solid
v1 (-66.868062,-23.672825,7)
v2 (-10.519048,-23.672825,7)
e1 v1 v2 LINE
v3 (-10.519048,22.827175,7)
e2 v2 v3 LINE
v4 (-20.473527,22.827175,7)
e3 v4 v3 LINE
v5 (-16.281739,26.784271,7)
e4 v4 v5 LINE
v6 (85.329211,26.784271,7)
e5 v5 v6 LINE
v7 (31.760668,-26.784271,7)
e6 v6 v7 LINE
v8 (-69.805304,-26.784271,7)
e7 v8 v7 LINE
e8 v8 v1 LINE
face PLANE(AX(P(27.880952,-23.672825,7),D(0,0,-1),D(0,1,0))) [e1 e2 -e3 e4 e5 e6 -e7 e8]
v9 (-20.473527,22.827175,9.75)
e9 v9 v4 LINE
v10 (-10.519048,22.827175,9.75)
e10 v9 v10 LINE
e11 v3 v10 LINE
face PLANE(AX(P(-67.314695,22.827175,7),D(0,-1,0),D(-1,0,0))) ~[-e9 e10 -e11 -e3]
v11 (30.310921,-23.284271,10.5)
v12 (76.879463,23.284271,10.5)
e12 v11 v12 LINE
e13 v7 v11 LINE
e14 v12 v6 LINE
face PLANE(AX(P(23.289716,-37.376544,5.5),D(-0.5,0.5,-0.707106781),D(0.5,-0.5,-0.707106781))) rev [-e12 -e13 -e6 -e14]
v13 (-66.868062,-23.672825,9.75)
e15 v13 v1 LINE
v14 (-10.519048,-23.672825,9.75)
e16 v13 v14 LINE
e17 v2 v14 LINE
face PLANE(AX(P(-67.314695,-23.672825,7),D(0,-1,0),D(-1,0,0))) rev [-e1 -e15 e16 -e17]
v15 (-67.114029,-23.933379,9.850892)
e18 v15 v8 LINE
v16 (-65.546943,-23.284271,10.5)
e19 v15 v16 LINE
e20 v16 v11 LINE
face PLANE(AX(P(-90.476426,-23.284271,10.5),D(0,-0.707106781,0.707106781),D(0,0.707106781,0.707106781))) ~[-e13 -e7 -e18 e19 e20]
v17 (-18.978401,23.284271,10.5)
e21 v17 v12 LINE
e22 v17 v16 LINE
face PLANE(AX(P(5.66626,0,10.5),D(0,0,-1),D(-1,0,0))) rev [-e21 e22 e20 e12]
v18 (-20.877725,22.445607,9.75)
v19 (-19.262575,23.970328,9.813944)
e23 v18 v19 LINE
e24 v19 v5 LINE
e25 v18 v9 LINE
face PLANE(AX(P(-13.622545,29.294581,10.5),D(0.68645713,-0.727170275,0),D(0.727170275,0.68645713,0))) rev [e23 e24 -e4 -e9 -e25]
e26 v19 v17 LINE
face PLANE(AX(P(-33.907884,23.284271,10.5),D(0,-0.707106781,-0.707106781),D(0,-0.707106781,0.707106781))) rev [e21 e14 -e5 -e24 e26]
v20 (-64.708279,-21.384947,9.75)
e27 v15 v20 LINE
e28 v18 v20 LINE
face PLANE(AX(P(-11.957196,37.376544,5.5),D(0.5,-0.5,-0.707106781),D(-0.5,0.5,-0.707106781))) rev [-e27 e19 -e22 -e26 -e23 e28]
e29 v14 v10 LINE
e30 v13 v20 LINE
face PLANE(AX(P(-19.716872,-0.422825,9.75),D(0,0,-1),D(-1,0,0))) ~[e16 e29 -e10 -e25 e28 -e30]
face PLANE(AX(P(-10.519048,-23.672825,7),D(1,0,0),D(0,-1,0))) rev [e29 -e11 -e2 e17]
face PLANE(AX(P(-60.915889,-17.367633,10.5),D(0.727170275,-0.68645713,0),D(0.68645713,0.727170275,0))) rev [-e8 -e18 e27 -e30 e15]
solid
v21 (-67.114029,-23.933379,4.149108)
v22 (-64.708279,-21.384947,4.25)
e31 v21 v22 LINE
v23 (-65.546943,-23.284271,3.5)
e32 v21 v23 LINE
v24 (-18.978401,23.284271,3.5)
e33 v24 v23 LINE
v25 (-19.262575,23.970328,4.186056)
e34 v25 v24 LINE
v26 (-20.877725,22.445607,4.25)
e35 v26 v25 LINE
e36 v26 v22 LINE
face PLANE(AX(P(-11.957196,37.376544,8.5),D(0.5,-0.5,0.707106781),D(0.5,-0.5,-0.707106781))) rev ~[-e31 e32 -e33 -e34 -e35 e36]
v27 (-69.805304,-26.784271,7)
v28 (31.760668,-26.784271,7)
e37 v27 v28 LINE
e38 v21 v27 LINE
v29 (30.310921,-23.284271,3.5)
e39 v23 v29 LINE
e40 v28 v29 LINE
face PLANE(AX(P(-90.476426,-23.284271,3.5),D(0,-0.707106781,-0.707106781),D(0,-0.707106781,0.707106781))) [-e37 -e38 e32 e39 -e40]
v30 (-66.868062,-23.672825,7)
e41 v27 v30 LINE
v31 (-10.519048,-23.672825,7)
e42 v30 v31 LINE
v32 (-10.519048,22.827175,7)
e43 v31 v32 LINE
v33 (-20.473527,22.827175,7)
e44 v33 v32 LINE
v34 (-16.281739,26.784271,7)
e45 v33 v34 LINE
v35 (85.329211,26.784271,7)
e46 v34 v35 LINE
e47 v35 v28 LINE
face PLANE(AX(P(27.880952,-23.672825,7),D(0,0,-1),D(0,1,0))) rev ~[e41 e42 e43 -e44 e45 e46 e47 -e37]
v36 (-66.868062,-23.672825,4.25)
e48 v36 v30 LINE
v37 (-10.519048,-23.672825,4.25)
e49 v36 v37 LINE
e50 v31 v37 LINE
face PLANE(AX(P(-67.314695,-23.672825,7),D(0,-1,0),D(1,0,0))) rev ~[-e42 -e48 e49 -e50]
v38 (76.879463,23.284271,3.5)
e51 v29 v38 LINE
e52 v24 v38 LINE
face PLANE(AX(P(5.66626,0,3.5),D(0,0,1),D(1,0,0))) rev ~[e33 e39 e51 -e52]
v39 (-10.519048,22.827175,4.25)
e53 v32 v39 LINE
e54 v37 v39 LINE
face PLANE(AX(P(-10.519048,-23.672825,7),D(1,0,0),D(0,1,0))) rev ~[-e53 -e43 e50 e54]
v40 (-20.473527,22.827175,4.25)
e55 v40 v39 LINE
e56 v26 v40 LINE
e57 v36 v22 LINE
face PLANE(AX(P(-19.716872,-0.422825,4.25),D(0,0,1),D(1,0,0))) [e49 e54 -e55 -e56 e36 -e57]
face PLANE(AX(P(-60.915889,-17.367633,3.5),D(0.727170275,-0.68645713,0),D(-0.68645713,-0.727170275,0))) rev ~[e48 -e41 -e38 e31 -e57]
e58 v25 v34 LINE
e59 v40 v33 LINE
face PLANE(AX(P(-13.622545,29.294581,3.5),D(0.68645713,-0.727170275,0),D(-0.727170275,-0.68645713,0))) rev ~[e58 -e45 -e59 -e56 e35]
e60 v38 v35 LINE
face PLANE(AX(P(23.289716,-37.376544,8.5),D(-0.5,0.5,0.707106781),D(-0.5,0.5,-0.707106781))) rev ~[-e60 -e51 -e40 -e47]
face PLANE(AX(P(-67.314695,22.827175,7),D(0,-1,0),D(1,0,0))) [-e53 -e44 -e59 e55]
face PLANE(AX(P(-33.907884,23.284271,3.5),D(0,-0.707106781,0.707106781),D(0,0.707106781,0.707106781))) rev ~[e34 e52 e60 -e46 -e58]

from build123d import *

# Parameters (mm, degrees)
F2_DEPTH    = 3.5
F3_T1_DEPTH = 105.7168298797
F3_T3_DEPTH = 135.7168298797
F3_T5_DEPTH = 105.7168298797
F3_T7_DEPTH = 135.7168298797
F5_W        = 95.1956471843
F5_H        = 46.5
F6_DEPTH    = 2.75
F7_DEPTH    = 25
F9_DEPTH    = 38.4
F10_DEPTH   = 38.4


# Not quite as in the source:
# - a fillet or chamfer that OpenCascade refuses, or shapes differently, is made with other operations: its cross-section is extruded or revolved along the edge and cut away or added


with BuildPart() as f2:
    # F1 (on offset) → F2 (new body)
    with BuildSketch(Plane.XY.offset(3.5)):
        Polygon((11.806184426, -28.2842712475), (32.3819887268, -28.2842712475), (60.6662599742, 0), (88.9505312217, 28.2842712475), (-21.0494687783, 28.2842712475), (-77.6180112732, -28.2842712475), align=None)
    extrude(amount=F2_DEPTH)

    # F3: chamfer of 5 on 4 edges, made by hand

    # F3_s2 → F3_t1 (cut)
    with BuildSketch(Plane(origin=(12.7096736338, 12.7096736338, 0), x_dir=(0, 0, 1), z_dir=(-0.7071067812, -0.7071067812, 0))):
        Polygon((8.5, 34.8842221135), (3.5, 29.8842221135), (3.5, 34.8842221135), align=None)
    extrude(amount=F3_T1_DEPTH, mode=Mode.SUBTRACT)

    # F3_s4 → F3_t3 (cut)
    with BuildSketch(Plane.YZ.offset(-90.476426213)):
        Polygon((-23.2842712475, 3.5), (-28.2842712475, 8.5), (-28.2842712475, 3.5), align=None)
    extrude(amount=F3_T3_DEPTH, mode=Mode.SUBTRACT)

    # F3_s6 → F3_t5 (cut)
    with BuildSketch(Plane(origin=(-7.0434136596, -7.0434136596, 0), x_dir=(0, 0, 1), z_dir=(0.7071067812, 0.7071067812, 0))):
        Polygon((8.5, 42.897523817), (3.5, 37.897523817), (3.5, 42.897523817), align=None)
    extrude(amount=F3_T5_DEPTH, mode=Mode.SUBTRACT)

    # F3_s8 → F3_t7 (cut)
    with BuildSketch(Plane.YZ.offset(-33.9078837181)):
        Polygon((23.2842712475, 3.5), (28.2842712475, 8.5), (28.2842712475, 3.5), align=None)
    extrude(amount=F3_T7_DEPTH, mode=Mode.SUBTRACT)

    # F5 (on face) → F6 (cut)
    with BuildSketch(Plane.XY.offset(7)):
        with Locations((-19.7168718299, -0.4228247255)):
            Rectangle(F5_W, F5_H)
    extrude(amount=-F6_DEPTH, mode=Mode.SUBTRACT)

    # F4 (on face) → F7 (cut)
    with BuildSketch(Plane(origin=(0, 0, 3.5), x_dir=(1, 0, 0), z_dir=(0, 0, -1))):
        Polygon((-24.8950392013, -18.653216398), (-27.3769648583, -30.3716328172), (-13.6225454044, -33.1324383258), (-13.6225454044, -29.2945806164), align=None)
        Polygon((-72.634305031, 14.8857073556), (-60.9158886119, 17.3676330126), (-71.5572528303, 28.6401268095), (-75.3951105397, 28.6401268095), align=None)
    extrude(amount=-F7_DEPTH, mode=Mode.SUBTRACT)


with BuildPart() as f8_1:
    # F8: instance of F2
    add(f2.part.mirror(Plane.XY.offset(7)))

    # F10 (add): a face of the model
    f10_faces = [f8_1.faces().sort_by_distance(p)[0] for p in [
        (27.8809517622, -0.4228247255, 8.375),
    ]]
    extrude(f10_faces, amount=F10_DEPTH)


with BuildPart() as f2_1:
    add(f2.part)

    # F9 (add): a face of the model
    f9_faces = [f2_1.faces().sort_by_distance(p)[0] for p in [
        (27.8809517622, -0.4228247255, 5.625),
    ]]
    extrude(f9_faces, amount=F9_DEPTH)


solid = Compound([f8_1.part, f2_1.part])
